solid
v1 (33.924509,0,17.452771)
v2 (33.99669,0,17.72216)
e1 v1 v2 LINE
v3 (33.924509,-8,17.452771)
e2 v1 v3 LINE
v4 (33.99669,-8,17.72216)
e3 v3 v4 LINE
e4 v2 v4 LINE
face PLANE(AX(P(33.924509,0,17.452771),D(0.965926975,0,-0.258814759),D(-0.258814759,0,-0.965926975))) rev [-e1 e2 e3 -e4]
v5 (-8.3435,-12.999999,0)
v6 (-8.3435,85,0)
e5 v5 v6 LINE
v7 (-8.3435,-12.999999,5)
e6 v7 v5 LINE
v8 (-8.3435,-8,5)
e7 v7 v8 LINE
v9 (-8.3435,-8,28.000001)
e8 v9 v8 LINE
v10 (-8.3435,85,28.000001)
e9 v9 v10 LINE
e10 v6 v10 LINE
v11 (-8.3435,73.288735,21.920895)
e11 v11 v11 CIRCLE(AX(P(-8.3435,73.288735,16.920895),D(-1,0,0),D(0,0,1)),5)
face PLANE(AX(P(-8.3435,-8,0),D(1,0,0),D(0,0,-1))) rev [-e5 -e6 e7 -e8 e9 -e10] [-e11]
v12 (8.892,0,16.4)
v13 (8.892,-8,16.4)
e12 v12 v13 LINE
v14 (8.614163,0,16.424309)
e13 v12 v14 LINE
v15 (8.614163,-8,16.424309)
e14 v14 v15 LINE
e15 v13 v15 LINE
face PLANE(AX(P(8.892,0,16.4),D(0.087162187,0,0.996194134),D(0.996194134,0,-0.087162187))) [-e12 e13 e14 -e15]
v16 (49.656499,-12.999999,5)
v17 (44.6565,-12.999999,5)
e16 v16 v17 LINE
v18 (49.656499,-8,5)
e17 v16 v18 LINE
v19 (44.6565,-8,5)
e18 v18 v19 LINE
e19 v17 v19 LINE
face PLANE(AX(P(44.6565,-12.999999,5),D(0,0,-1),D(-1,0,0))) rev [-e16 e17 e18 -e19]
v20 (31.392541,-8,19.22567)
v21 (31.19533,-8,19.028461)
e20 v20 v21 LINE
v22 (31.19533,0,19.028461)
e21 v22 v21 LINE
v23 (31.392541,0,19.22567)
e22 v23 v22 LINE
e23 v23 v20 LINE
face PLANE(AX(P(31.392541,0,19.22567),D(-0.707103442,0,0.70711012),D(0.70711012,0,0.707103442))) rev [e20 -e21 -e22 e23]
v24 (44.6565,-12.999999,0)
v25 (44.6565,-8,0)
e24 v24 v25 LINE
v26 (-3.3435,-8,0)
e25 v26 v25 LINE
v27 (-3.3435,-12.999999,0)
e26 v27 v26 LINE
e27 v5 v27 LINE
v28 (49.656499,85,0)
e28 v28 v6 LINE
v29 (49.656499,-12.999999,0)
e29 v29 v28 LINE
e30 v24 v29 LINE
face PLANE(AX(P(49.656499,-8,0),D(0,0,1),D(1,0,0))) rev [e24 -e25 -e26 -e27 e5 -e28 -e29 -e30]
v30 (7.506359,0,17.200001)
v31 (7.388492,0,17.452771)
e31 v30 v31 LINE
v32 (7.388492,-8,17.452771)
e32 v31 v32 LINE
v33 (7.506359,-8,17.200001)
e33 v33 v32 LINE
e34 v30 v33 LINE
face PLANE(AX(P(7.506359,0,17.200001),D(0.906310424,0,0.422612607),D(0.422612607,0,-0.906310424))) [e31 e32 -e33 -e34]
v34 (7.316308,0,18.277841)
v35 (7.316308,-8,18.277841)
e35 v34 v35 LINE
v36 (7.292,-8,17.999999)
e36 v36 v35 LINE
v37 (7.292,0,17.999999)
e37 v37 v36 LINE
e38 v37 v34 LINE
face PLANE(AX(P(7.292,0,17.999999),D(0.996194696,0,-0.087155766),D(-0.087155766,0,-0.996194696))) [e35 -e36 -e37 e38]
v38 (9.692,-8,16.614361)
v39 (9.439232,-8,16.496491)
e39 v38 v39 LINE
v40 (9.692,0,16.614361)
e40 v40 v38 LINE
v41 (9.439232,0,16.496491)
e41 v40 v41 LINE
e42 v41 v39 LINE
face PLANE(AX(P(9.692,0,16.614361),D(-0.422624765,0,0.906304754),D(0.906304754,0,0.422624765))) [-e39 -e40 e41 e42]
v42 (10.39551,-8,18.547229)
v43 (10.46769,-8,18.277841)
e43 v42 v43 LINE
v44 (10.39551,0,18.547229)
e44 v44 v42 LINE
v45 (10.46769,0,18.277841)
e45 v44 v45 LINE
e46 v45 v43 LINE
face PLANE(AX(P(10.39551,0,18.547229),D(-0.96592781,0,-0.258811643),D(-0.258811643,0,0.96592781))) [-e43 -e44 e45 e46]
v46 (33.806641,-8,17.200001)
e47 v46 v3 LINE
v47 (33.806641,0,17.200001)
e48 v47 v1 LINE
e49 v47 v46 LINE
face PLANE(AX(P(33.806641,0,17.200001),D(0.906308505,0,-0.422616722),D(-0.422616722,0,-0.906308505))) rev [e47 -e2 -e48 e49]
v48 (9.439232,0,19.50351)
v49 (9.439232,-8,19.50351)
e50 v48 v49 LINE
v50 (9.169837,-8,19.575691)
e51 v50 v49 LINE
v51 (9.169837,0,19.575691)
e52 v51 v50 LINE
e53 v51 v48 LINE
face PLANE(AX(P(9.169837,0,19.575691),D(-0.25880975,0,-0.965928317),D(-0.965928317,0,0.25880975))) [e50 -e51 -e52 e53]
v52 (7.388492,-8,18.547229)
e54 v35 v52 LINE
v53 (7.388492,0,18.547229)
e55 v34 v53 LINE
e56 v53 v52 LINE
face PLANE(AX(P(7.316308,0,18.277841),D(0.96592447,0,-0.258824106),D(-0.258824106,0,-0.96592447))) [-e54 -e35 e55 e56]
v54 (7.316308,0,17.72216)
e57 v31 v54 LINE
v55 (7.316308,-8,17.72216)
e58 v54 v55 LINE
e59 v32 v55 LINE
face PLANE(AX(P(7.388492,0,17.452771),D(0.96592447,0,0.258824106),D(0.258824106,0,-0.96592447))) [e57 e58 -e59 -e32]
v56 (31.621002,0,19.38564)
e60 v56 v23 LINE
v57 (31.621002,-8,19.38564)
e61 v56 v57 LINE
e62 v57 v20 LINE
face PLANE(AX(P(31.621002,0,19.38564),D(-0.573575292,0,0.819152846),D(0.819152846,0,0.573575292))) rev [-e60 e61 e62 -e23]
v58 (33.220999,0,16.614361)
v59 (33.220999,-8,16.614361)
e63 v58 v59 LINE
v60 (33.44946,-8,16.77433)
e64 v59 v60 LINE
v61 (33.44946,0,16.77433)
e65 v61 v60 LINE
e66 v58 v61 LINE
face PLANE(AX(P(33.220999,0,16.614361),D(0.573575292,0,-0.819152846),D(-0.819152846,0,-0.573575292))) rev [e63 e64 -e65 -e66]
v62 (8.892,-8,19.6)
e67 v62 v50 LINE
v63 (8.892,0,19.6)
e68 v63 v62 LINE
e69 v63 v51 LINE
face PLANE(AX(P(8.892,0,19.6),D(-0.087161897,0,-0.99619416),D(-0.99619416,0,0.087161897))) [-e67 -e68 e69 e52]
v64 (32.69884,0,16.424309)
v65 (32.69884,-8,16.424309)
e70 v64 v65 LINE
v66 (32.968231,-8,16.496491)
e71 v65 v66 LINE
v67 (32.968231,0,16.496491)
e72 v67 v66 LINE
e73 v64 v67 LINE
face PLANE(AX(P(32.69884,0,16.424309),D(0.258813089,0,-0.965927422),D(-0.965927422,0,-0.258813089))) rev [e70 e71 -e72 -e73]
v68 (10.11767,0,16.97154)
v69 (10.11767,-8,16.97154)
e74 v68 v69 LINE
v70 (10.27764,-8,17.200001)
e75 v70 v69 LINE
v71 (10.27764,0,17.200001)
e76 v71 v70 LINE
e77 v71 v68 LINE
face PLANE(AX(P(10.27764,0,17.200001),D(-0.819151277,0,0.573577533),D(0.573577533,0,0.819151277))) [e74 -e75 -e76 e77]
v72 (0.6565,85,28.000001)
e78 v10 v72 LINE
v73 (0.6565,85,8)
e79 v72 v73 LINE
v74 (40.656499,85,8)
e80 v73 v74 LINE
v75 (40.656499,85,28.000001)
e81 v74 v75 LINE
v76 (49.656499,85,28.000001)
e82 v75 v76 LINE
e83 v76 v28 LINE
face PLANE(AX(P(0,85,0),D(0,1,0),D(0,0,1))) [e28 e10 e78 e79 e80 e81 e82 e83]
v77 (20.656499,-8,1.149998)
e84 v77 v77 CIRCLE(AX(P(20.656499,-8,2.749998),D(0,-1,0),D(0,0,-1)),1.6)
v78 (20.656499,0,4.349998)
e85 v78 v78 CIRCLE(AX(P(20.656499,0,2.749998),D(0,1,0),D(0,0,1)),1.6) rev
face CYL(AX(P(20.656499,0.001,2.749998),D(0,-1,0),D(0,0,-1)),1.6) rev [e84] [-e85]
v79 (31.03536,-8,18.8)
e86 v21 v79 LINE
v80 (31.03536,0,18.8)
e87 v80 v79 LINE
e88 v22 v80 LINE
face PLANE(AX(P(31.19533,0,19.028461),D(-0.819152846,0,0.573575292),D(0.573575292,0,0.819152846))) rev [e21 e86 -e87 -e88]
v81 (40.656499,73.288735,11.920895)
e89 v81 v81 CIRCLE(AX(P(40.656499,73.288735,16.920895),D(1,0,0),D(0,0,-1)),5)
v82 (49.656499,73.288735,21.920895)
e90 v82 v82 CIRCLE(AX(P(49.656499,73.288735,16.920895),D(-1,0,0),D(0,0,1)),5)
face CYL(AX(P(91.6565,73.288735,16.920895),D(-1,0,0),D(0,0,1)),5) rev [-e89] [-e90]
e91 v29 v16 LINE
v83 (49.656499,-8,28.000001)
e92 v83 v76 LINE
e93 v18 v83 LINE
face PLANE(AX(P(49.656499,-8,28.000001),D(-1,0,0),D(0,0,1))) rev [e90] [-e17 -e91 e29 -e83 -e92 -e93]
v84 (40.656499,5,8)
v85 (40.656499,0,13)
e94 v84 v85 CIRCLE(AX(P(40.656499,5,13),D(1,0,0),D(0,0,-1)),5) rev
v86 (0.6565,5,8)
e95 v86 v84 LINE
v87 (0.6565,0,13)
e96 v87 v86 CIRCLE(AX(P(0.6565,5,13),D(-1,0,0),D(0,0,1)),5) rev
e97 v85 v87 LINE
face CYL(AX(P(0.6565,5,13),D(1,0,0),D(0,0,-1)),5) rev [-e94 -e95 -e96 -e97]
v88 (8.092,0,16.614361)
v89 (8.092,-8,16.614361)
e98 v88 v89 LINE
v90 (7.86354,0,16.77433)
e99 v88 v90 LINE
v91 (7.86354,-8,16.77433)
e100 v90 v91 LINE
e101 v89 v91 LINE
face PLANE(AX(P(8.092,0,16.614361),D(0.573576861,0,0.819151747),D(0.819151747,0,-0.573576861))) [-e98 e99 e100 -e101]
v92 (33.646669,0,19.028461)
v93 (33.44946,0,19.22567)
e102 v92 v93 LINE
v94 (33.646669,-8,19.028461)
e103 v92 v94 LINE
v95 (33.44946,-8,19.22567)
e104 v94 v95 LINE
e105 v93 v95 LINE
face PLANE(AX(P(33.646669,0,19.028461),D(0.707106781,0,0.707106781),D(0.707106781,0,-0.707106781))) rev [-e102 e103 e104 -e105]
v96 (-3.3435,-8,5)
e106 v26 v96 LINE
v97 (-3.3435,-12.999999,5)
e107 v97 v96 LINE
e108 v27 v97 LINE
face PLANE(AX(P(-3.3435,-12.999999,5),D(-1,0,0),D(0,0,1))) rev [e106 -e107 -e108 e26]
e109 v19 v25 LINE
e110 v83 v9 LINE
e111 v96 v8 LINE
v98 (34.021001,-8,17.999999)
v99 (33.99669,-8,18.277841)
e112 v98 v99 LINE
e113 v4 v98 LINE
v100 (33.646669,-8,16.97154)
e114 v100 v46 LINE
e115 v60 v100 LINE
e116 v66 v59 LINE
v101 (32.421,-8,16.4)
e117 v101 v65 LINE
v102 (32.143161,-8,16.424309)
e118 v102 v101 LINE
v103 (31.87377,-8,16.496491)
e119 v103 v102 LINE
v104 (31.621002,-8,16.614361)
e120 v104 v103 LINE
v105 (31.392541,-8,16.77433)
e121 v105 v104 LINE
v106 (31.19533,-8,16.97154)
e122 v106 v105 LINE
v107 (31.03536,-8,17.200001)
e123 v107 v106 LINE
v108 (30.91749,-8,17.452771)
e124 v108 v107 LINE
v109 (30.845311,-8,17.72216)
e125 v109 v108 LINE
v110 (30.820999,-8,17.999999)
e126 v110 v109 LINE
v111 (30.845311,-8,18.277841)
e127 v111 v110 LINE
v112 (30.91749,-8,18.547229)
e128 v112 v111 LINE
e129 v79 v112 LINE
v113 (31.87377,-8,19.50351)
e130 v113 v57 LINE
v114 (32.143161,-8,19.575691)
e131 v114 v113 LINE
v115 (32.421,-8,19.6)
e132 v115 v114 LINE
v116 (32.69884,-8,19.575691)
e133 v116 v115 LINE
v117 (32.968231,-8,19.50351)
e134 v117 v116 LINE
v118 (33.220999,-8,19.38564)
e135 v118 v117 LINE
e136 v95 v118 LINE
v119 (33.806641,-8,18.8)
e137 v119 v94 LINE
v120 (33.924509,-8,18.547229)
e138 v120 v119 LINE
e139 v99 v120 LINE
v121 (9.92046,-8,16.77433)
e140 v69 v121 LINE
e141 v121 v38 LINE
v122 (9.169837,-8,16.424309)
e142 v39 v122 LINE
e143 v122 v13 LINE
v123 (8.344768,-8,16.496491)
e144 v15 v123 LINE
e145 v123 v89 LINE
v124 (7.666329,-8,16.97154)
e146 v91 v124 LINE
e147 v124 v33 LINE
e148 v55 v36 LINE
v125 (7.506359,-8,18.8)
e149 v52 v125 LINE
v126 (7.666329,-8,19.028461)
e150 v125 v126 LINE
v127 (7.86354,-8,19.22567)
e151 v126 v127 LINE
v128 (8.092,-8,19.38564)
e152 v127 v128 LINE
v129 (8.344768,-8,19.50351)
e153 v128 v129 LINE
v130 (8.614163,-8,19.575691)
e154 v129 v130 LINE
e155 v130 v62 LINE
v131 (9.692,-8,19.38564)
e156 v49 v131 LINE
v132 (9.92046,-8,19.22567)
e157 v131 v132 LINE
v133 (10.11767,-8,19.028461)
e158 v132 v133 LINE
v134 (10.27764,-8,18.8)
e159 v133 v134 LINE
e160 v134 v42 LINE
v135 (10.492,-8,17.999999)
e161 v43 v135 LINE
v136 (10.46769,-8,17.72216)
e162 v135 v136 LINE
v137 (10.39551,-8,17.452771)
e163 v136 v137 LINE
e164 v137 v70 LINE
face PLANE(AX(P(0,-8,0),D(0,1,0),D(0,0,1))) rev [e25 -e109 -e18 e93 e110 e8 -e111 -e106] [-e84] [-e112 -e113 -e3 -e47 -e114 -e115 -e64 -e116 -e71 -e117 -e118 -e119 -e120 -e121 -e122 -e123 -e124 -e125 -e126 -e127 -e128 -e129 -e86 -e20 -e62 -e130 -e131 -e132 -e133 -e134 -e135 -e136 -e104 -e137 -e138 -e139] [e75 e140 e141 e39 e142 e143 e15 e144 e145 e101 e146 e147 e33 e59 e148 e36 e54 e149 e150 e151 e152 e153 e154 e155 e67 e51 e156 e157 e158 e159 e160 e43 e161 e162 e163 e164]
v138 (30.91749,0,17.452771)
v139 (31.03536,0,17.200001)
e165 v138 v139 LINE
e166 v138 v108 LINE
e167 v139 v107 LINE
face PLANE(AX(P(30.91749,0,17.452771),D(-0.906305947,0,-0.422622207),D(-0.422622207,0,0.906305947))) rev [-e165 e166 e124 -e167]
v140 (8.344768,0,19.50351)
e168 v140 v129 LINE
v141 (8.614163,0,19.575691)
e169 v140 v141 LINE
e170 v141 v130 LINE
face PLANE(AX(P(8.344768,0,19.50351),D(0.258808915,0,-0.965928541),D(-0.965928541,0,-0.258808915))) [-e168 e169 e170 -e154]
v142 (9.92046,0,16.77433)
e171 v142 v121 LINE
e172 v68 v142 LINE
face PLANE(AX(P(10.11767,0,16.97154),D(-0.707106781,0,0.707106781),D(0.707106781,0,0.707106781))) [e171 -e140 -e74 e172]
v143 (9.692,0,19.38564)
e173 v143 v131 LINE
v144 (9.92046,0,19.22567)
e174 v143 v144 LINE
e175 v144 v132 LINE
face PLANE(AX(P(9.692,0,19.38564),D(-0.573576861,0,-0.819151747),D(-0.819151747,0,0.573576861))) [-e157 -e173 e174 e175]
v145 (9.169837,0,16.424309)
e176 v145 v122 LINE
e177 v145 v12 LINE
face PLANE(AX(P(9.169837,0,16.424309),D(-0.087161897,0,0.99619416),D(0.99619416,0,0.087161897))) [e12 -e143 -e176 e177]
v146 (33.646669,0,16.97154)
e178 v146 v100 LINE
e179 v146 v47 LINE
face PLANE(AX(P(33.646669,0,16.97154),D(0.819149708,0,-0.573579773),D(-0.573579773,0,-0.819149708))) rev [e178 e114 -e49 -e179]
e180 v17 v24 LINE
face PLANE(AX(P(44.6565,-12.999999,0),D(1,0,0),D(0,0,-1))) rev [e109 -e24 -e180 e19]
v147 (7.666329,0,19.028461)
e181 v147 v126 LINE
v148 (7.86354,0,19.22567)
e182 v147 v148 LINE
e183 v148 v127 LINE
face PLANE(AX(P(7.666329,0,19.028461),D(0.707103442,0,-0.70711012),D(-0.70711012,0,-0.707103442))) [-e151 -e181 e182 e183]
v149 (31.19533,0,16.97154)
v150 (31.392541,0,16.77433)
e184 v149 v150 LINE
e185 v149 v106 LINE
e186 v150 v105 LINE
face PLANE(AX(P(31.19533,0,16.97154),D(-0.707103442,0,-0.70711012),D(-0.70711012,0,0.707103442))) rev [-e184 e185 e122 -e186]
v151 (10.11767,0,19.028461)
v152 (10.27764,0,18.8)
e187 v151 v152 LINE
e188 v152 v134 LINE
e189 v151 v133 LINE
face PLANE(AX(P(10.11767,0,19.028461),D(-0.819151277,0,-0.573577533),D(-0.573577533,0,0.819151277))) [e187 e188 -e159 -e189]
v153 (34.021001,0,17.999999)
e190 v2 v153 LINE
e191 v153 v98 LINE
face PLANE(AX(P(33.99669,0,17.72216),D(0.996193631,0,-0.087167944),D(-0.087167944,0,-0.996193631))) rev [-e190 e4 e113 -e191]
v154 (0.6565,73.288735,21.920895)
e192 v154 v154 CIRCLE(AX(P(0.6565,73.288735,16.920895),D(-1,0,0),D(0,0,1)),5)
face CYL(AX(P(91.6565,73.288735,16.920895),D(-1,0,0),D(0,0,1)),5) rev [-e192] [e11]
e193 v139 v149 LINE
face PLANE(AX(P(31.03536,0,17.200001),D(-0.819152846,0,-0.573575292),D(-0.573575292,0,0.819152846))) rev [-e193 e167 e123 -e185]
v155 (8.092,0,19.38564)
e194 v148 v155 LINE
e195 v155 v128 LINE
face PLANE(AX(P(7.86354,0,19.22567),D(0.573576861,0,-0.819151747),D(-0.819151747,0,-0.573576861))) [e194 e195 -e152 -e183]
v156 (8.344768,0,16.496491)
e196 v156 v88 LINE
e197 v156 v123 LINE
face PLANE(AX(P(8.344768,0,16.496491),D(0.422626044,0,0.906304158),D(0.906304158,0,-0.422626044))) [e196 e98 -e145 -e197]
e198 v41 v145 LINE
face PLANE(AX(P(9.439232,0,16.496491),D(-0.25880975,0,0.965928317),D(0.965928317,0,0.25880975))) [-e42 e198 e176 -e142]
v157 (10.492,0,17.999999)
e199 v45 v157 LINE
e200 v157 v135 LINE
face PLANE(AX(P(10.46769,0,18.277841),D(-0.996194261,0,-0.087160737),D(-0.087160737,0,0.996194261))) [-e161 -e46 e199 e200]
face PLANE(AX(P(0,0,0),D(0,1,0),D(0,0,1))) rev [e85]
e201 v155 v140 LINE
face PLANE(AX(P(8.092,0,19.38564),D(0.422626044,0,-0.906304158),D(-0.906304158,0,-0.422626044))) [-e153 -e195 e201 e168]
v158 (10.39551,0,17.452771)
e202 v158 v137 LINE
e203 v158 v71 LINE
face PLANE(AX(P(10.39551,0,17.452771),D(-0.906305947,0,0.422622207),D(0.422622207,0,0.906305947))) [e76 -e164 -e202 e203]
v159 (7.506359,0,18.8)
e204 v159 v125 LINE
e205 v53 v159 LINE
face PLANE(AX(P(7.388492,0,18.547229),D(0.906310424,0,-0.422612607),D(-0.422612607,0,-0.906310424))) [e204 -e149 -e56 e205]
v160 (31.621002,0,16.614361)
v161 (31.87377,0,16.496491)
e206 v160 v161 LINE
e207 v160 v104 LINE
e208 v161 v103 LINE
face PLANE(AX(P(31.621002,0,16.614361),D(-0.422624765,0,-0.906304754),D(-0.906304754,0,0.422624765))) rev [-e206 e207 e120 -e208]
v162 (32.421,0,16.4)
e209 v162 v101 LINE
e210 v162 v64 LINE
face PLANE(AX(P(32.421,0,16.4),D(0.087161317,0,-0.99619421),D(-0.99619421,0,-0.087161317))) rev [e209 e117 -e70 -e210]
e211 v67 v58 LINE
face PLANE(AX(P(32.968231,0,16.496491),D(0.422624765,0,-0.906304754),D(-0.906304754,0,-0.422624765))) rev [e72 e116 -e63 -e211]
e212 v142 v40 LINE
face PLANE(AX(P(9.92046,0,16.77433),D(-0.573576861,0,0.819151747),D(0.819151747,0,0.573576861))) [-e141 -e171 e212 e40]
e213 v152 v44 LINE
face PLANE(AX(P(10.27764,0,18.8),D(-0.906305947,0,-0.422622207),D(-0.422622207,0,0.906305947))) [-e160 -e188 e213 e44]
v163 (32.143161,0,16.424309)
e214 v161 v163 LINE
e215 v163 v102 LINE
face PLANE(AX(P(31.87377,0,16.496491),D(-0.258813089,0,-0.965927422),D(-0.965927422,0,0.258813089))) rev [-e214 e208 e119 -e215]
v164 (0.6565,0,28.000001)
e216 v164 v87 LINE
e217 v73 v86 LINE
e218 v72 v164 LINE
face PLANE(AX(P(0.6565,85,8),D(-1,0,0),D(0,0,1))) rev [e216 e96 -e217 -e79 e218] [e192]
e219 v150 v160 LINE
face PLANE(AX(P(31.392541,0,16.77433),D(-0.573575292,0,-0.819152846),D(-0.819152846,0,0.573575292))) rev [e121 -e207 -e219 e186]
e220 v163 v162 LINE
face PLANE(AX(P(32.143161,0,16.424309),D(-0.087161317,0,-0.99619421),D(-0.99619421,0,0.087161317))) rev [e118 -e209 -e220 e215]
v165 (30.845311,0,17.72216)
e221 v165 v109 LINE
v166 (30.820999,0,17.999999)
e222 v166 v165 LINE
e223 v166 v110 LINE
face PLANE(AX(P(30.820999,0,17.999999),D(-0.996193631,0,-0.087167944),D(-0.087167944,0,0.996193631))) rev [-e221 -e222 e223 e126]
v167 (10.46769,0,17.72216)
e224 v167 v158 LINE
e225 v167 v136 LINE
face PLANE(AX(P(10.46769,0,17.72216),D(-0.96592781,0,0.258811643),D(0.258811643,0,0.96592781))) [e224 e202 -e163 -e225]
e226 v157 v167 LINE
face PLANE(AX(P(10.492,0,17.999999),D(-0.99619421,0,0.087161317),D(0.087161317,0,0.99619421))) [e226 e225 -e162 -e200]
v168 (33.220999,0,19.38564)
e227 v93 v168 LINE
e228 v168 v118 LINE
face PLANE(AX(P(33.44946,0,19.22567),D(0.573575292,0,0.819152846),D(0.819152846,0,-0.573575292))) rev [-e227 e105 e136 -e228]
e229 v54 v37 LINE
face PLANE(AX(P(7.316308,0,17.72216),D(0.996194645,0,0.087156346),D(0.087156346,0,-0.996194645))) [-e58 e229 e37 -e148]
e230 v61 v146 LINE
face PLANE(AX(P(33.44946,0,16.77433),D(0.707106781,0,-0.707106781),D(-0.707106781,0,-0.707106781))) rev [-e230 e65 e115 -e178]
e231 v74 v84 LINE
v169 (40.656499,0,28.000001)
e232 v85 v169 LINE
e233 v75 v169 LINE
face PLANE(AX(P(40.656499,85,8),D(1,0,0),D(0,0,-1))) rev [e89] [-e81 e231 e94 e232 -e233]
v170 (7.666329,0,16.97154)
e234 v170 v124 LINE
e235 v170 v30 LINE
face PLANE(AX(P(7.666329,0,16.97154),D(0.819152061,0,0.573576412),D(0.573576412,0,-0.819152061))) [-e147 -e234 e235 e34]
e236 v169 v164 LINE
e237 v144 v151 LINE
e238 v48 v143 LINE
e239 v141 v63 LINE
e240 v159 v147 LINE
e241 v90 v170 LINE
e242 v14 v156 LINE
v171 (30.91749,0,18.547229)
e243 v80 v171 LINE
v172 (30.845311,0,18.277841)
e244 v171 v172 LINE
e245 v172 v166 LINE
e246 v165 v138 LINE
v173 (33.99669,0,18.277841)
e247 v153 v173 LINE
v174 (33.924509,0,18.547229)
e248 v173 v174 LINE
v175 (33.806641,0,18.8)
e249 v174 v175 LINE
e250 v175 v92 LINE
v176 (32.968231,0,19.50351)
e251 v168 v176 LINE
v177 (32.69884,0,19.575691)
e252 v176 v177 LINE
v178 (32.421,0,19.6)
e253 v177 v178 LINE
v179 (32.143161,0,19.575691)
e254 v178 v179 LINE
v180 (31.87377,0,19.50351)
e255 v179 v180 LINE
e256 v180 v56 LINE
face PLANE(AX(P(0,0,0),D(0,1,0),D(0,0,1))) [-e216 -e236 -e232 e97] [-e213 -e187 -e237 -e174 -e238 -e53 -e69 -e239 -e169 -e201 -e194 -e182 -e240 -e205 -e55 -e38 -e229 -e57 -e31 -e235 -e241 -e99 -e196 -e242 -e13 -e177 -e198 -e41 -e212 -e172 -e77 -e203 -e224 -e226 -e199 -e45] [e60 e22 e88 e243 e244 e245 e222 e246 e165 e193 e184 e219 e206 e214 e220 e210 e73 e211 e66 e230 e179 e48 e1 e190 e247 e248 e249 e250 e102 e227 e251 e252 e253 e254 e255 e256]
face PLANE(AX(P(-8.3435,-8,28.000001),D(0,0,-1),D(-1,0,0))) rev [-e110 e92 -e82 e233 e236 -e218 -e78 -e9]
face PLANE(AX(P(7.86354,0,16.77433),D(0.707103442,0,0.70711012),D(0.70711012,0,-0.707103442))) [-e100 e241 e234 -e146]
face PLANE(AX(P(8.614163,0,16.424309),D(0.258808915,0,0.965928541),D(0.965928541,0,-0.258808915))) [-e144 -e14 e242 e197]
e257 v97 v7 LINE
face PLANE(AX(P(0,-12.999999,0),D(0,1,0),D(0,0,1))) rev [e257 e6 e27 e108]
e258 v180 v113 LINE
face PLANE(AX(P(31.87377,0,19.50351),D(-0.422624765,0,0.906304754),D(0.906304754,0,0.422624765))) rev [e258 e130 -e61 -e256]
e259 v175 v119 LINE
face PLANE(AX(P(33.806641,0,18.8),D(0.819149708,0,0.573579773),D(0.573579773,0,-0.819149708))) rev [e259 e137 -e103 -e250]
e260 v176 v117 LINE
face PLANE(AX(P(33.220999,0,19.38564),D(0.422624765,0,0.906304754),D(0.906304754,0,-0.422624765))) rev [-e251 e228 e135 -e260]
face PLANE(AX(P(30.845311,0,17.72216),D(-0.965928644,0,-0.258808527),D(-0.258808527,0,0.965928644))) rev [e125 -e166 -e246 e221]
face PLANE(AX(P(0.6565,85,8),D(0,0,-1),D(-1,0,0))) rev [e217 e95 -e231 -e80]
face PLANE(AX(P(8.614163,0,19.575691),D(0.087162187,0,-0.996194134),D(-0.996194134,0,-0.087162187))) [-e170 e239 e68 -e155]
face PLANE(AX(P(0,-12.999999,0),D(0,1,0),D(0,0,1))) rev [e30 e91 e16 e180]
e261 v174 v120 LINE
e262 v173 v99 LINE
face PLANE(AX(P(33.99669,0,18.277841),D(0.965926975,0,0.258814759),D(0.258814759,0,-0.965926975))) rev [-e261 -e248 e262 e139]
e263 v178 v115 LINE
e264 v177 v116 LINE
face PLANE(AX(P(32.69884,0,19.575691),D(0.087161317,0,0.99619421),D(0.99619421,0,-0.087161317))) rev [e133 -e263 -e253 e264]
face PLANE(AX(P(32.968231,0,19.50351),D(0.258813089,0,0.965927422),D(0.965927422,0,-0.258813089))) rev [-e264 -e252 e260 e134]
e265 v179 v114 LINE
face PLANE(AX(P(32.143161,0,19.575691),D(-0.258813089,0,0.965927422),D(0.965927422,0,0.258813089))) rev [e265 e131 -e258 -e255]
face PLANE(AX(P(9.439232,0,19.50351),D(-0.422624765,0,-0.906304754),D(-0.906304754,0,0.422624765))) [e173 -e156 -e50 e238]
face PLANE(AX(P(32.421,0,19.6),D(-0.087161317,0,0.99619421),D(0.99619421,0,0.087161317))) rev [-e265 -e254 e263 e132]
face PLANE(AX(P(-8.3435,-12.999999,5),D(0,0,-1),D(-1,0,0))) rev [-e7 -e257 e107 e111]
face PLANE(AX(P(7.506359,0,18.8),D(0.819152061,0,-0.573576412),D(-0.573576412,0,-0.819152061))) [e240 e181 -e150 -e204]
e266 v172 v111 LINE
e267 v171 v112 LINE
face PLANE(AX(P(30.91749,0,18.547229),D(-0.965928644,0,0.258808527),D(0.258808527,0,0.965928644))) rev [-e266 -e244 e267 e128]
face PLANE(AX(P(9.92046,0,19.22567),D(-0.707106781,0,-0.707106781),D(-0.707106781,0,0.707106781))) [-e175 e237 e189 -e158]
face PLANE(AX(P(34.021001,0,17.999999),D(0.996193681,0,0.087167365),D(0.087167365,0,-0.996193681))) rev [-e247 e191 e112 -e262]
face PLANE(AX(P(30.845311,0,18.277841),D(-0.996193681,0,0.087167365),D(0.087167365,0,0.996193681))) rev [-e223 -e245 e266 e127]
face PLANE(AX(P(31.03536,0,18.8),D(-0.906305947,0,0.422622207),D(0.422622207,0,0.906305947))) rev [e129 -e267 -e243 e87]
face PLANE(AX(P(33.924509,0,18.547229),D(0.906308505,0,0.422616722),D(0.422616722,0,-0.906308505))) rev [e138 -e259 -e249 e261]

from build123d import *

# Parameters (mm, degrees)
SKETCH1_W           = 57.999999262
SKETCH1_H           = 28.000000864
BOSS_EXTRUDE1_DEPTH = 8
CUT_EXTRUDE10_REACH = 59.565
SKETCH11_R          = 1.6
CUT_EXTRUDE11_DEPTH = 58.565336436
CUT_EXTRUDE12_DEPTH = 58.565336436
SKETCH15_W          = 5.000000121
SKETCH15_H          = 4.999999888
BOSS_EXTRUDE2_DEPTH = 4.999998957
SKETCH16_W          = 4.999998957
SKETCH16_H          = 4.999999888
BOSS_EXTRUDE3_DEPTH = 4.999998957
BOSS_EXTRUDE4_DEPTH = 85
HOLE2_START         = -8.343500085
HOLE2_OUTLINE_R     = 5
HOLE2_DEPTH         = 57.999999262
FILLET1_R           = 5


# Read off the part's stored shape, not the designer's step: Hole2
with BuildPart() as part:
    # Sketch1 → Boss-Extrude1 (new body)
    with BuildSketch(Plane.XZ):
        with Locations((20.656499546, 14.000000432)):
            Rectangle(SKETCH1_W, SKETCH1_H)
    extrude(amount=BOSS_EXTRUDE1_DEPTH)

    # Sketch11 → Cut-Extrude10 (cut, up to next)
    with BuildSketch(Plane.XZ.offset(8), mode=Mode.PRIVATE) as cut_extrude10_sk1:
        with Locations(Location((20.656499132, 2.749998098, 0), (0, 0, 270))):
            Circle(SKETCH11_R)
    cut_extrude10_tool1 = extrude(cut_extrude10_sk1.sketch, amount=-CUT_EXTRUDE10_REACH, mode=Mode.PRIVATE) & part.part
    add(cut_extrude10_tool1.solids().sort_by_distance((20.656499, -8, 2.749998))[0], mode=Mode.SUBTRACT)

    # Sketch12 → Cut-Extrude11 (cut, through all)
    with BuildSketch(Plane(origin=(0, -8, 0), x_dir=(-1, 0, 0), z_dir=(0, 1, 0))):
        Polygon((-7.388492115, 18.547229469), (-7.506358903, 18.799999729), (-7.666328922, 19.028460607), (-7.863540202, 19.225670025), (-8.092000149, 19.385639578), (-8.344767615, 19.503509626), (-8.614162914, 19.575690851), (-8.891999722, 19.600000232), (-9.16983746, 19.575690851), (-9.439231828, 19.503509626), (-9.692000225, 19.385639578), (-9.920460172, 19.225670025), (-10.11766959, 19.028460607), (-10.277640074, 18.799999729), (-10.395510122, 18.547229469), (-10.467690416, 18.277840689), (-10.491999798, 17.999999225), (-10.467690416, 17.722159624), (-10.395510122, 17.452770844), (-10.277640074, 17.200000584), (-10.11766959, 16.971539706), (-9.920460172, 16.774330288), (-9.692000225, 16.614360735), (-9.439231828, 16.496490687), (-9.16983746, 16.424309462), (-8.891999722, 16.40000008), (-8.614162914, 16.424309462), (-8.344767615, 16.496490687), (-8.092000149, 16.614360735), (-7.863540202, 16.774330288), (-7.666328922, 16.971539706), (-7.506358903, 17.200000584), (-7.388492115, 17.452770844), (-7.316308096, 17.722159624), (-7.292000111, 17.999999225), (-7.316308096, 18.277840689), align=None)
    extrude(amount=CUT_EXTRUDE11_DEPTH, mode=Mode.SUBTRACT)

    # Sketch13 → Cut-Extrude12 (cut, through all)
    with BuildSketch(Plane.XZ.offset(8)):
        Polygon((32.698839903, 16.424309462), (32.968230546, 16.496490687), (33.220998943, 16.614360735), (33.449459821, 16.774330288), (33.646669239, 16.971539706), (33.806640655, 17.200000584), (33.92450884, 17.452770844), (33.996690065, 17.722159624), (34.021001309, 17.999999225), (33.996690065, 18.277840689), (33.92450884, 18.547229469), (33.806640655, 18.799999729), (33.646669239, 19.028460607), (33.449459821, 19.225670025), (33.220998943, 19.385639578), (32.968230546, 19.503509626), (32.698839903, 19.575690851), (32.421000302, 19.600000232), (32.143160701, 19.575690851), (31.873770058, 19.503509626), (31.621001661, 19.385639578), (31.392540783, 19.225670025), (31.195329502, 19.028460607), (31.035359949, 18.799999729), (30.917489901, 18.547229469), (30.845310539, 18.277840689), (30.820999295, 17.999999225), (30.845310539, 17.722159624), (30.917489901, 17.452770844), (31.035359949, 17.200000584), (31.195329502, 16.971539706), (31.392540783, 16.774330288), (31.621001661, 16.614360735), (31.873770058, 16.496490687), (32.143160701, 16.424309462), (32.421000302, 16.40000008), align=None)
    extrude(amount=-CUT_EXTRUDE12_DEPTH, mode=Mode.SUBTRACT)

    # Sketch15 → Boss-Extrude2 (add)
    with BuildSketch(Plane.XZ.offset(8)):
        with Locations((-5.843500025, 2.499999944)):
            Rectangle(SKETCH15_W, SKETCH15_H)
    extrude(amount=BOSS_EXTRUDE2_DEPTH)

    # Sketch16 → Boss-Extrude3 (add)
    with BuildSketch(Plane.XZ.offset(8)):
        with Locations((47.156499698, 2.499999944)):
            Rectangle(SKETCH16_W, SKETCH16_H)
    extrude(amount=BOSS_EXTRUDE3_DEPTH)

    # Sketch17 → Boss-Extrude4 (add)
    with BuildSketch(Plane(origin=(0, 0, 0), x_dir=(1, 0, 0), z_dir=(0, 1, 0))):
        Polygon((-8.343500085, 0), (49.656499177, 0), (49.656499177, -8), (49.656499177, -28.000000864), (40.656499177, -28.000000864), (40.656499177, -8), (0.656499915, -8), (0.656499915, -28.000000864), (-8.343500085, -28.000000864), (-8.343500085, -8), align=None)
    extrude(amount=BOSS_EXTRUDE4_DEPTH)

    # Hole2 outline → Hole2 (cut)
    with BuildSketch(Plane.YZ.offset(HOLE2_START)):
        with Locations((73.288734932, 16.920895282)):
            Circle(HOLE2_OUTLINE_R)
    extrude(amount=HOLE2_DEPTH, mode=Mode.SUBTRACT)

    # Fillet1
    fillet1_edges = [part.edges().sort_by_distance(p)[0] for p in [
        (20.656499546, 0, 8),
    ]]
    fillet(fillet1_edges, radius=FILLET1_R)


solid = part.part
